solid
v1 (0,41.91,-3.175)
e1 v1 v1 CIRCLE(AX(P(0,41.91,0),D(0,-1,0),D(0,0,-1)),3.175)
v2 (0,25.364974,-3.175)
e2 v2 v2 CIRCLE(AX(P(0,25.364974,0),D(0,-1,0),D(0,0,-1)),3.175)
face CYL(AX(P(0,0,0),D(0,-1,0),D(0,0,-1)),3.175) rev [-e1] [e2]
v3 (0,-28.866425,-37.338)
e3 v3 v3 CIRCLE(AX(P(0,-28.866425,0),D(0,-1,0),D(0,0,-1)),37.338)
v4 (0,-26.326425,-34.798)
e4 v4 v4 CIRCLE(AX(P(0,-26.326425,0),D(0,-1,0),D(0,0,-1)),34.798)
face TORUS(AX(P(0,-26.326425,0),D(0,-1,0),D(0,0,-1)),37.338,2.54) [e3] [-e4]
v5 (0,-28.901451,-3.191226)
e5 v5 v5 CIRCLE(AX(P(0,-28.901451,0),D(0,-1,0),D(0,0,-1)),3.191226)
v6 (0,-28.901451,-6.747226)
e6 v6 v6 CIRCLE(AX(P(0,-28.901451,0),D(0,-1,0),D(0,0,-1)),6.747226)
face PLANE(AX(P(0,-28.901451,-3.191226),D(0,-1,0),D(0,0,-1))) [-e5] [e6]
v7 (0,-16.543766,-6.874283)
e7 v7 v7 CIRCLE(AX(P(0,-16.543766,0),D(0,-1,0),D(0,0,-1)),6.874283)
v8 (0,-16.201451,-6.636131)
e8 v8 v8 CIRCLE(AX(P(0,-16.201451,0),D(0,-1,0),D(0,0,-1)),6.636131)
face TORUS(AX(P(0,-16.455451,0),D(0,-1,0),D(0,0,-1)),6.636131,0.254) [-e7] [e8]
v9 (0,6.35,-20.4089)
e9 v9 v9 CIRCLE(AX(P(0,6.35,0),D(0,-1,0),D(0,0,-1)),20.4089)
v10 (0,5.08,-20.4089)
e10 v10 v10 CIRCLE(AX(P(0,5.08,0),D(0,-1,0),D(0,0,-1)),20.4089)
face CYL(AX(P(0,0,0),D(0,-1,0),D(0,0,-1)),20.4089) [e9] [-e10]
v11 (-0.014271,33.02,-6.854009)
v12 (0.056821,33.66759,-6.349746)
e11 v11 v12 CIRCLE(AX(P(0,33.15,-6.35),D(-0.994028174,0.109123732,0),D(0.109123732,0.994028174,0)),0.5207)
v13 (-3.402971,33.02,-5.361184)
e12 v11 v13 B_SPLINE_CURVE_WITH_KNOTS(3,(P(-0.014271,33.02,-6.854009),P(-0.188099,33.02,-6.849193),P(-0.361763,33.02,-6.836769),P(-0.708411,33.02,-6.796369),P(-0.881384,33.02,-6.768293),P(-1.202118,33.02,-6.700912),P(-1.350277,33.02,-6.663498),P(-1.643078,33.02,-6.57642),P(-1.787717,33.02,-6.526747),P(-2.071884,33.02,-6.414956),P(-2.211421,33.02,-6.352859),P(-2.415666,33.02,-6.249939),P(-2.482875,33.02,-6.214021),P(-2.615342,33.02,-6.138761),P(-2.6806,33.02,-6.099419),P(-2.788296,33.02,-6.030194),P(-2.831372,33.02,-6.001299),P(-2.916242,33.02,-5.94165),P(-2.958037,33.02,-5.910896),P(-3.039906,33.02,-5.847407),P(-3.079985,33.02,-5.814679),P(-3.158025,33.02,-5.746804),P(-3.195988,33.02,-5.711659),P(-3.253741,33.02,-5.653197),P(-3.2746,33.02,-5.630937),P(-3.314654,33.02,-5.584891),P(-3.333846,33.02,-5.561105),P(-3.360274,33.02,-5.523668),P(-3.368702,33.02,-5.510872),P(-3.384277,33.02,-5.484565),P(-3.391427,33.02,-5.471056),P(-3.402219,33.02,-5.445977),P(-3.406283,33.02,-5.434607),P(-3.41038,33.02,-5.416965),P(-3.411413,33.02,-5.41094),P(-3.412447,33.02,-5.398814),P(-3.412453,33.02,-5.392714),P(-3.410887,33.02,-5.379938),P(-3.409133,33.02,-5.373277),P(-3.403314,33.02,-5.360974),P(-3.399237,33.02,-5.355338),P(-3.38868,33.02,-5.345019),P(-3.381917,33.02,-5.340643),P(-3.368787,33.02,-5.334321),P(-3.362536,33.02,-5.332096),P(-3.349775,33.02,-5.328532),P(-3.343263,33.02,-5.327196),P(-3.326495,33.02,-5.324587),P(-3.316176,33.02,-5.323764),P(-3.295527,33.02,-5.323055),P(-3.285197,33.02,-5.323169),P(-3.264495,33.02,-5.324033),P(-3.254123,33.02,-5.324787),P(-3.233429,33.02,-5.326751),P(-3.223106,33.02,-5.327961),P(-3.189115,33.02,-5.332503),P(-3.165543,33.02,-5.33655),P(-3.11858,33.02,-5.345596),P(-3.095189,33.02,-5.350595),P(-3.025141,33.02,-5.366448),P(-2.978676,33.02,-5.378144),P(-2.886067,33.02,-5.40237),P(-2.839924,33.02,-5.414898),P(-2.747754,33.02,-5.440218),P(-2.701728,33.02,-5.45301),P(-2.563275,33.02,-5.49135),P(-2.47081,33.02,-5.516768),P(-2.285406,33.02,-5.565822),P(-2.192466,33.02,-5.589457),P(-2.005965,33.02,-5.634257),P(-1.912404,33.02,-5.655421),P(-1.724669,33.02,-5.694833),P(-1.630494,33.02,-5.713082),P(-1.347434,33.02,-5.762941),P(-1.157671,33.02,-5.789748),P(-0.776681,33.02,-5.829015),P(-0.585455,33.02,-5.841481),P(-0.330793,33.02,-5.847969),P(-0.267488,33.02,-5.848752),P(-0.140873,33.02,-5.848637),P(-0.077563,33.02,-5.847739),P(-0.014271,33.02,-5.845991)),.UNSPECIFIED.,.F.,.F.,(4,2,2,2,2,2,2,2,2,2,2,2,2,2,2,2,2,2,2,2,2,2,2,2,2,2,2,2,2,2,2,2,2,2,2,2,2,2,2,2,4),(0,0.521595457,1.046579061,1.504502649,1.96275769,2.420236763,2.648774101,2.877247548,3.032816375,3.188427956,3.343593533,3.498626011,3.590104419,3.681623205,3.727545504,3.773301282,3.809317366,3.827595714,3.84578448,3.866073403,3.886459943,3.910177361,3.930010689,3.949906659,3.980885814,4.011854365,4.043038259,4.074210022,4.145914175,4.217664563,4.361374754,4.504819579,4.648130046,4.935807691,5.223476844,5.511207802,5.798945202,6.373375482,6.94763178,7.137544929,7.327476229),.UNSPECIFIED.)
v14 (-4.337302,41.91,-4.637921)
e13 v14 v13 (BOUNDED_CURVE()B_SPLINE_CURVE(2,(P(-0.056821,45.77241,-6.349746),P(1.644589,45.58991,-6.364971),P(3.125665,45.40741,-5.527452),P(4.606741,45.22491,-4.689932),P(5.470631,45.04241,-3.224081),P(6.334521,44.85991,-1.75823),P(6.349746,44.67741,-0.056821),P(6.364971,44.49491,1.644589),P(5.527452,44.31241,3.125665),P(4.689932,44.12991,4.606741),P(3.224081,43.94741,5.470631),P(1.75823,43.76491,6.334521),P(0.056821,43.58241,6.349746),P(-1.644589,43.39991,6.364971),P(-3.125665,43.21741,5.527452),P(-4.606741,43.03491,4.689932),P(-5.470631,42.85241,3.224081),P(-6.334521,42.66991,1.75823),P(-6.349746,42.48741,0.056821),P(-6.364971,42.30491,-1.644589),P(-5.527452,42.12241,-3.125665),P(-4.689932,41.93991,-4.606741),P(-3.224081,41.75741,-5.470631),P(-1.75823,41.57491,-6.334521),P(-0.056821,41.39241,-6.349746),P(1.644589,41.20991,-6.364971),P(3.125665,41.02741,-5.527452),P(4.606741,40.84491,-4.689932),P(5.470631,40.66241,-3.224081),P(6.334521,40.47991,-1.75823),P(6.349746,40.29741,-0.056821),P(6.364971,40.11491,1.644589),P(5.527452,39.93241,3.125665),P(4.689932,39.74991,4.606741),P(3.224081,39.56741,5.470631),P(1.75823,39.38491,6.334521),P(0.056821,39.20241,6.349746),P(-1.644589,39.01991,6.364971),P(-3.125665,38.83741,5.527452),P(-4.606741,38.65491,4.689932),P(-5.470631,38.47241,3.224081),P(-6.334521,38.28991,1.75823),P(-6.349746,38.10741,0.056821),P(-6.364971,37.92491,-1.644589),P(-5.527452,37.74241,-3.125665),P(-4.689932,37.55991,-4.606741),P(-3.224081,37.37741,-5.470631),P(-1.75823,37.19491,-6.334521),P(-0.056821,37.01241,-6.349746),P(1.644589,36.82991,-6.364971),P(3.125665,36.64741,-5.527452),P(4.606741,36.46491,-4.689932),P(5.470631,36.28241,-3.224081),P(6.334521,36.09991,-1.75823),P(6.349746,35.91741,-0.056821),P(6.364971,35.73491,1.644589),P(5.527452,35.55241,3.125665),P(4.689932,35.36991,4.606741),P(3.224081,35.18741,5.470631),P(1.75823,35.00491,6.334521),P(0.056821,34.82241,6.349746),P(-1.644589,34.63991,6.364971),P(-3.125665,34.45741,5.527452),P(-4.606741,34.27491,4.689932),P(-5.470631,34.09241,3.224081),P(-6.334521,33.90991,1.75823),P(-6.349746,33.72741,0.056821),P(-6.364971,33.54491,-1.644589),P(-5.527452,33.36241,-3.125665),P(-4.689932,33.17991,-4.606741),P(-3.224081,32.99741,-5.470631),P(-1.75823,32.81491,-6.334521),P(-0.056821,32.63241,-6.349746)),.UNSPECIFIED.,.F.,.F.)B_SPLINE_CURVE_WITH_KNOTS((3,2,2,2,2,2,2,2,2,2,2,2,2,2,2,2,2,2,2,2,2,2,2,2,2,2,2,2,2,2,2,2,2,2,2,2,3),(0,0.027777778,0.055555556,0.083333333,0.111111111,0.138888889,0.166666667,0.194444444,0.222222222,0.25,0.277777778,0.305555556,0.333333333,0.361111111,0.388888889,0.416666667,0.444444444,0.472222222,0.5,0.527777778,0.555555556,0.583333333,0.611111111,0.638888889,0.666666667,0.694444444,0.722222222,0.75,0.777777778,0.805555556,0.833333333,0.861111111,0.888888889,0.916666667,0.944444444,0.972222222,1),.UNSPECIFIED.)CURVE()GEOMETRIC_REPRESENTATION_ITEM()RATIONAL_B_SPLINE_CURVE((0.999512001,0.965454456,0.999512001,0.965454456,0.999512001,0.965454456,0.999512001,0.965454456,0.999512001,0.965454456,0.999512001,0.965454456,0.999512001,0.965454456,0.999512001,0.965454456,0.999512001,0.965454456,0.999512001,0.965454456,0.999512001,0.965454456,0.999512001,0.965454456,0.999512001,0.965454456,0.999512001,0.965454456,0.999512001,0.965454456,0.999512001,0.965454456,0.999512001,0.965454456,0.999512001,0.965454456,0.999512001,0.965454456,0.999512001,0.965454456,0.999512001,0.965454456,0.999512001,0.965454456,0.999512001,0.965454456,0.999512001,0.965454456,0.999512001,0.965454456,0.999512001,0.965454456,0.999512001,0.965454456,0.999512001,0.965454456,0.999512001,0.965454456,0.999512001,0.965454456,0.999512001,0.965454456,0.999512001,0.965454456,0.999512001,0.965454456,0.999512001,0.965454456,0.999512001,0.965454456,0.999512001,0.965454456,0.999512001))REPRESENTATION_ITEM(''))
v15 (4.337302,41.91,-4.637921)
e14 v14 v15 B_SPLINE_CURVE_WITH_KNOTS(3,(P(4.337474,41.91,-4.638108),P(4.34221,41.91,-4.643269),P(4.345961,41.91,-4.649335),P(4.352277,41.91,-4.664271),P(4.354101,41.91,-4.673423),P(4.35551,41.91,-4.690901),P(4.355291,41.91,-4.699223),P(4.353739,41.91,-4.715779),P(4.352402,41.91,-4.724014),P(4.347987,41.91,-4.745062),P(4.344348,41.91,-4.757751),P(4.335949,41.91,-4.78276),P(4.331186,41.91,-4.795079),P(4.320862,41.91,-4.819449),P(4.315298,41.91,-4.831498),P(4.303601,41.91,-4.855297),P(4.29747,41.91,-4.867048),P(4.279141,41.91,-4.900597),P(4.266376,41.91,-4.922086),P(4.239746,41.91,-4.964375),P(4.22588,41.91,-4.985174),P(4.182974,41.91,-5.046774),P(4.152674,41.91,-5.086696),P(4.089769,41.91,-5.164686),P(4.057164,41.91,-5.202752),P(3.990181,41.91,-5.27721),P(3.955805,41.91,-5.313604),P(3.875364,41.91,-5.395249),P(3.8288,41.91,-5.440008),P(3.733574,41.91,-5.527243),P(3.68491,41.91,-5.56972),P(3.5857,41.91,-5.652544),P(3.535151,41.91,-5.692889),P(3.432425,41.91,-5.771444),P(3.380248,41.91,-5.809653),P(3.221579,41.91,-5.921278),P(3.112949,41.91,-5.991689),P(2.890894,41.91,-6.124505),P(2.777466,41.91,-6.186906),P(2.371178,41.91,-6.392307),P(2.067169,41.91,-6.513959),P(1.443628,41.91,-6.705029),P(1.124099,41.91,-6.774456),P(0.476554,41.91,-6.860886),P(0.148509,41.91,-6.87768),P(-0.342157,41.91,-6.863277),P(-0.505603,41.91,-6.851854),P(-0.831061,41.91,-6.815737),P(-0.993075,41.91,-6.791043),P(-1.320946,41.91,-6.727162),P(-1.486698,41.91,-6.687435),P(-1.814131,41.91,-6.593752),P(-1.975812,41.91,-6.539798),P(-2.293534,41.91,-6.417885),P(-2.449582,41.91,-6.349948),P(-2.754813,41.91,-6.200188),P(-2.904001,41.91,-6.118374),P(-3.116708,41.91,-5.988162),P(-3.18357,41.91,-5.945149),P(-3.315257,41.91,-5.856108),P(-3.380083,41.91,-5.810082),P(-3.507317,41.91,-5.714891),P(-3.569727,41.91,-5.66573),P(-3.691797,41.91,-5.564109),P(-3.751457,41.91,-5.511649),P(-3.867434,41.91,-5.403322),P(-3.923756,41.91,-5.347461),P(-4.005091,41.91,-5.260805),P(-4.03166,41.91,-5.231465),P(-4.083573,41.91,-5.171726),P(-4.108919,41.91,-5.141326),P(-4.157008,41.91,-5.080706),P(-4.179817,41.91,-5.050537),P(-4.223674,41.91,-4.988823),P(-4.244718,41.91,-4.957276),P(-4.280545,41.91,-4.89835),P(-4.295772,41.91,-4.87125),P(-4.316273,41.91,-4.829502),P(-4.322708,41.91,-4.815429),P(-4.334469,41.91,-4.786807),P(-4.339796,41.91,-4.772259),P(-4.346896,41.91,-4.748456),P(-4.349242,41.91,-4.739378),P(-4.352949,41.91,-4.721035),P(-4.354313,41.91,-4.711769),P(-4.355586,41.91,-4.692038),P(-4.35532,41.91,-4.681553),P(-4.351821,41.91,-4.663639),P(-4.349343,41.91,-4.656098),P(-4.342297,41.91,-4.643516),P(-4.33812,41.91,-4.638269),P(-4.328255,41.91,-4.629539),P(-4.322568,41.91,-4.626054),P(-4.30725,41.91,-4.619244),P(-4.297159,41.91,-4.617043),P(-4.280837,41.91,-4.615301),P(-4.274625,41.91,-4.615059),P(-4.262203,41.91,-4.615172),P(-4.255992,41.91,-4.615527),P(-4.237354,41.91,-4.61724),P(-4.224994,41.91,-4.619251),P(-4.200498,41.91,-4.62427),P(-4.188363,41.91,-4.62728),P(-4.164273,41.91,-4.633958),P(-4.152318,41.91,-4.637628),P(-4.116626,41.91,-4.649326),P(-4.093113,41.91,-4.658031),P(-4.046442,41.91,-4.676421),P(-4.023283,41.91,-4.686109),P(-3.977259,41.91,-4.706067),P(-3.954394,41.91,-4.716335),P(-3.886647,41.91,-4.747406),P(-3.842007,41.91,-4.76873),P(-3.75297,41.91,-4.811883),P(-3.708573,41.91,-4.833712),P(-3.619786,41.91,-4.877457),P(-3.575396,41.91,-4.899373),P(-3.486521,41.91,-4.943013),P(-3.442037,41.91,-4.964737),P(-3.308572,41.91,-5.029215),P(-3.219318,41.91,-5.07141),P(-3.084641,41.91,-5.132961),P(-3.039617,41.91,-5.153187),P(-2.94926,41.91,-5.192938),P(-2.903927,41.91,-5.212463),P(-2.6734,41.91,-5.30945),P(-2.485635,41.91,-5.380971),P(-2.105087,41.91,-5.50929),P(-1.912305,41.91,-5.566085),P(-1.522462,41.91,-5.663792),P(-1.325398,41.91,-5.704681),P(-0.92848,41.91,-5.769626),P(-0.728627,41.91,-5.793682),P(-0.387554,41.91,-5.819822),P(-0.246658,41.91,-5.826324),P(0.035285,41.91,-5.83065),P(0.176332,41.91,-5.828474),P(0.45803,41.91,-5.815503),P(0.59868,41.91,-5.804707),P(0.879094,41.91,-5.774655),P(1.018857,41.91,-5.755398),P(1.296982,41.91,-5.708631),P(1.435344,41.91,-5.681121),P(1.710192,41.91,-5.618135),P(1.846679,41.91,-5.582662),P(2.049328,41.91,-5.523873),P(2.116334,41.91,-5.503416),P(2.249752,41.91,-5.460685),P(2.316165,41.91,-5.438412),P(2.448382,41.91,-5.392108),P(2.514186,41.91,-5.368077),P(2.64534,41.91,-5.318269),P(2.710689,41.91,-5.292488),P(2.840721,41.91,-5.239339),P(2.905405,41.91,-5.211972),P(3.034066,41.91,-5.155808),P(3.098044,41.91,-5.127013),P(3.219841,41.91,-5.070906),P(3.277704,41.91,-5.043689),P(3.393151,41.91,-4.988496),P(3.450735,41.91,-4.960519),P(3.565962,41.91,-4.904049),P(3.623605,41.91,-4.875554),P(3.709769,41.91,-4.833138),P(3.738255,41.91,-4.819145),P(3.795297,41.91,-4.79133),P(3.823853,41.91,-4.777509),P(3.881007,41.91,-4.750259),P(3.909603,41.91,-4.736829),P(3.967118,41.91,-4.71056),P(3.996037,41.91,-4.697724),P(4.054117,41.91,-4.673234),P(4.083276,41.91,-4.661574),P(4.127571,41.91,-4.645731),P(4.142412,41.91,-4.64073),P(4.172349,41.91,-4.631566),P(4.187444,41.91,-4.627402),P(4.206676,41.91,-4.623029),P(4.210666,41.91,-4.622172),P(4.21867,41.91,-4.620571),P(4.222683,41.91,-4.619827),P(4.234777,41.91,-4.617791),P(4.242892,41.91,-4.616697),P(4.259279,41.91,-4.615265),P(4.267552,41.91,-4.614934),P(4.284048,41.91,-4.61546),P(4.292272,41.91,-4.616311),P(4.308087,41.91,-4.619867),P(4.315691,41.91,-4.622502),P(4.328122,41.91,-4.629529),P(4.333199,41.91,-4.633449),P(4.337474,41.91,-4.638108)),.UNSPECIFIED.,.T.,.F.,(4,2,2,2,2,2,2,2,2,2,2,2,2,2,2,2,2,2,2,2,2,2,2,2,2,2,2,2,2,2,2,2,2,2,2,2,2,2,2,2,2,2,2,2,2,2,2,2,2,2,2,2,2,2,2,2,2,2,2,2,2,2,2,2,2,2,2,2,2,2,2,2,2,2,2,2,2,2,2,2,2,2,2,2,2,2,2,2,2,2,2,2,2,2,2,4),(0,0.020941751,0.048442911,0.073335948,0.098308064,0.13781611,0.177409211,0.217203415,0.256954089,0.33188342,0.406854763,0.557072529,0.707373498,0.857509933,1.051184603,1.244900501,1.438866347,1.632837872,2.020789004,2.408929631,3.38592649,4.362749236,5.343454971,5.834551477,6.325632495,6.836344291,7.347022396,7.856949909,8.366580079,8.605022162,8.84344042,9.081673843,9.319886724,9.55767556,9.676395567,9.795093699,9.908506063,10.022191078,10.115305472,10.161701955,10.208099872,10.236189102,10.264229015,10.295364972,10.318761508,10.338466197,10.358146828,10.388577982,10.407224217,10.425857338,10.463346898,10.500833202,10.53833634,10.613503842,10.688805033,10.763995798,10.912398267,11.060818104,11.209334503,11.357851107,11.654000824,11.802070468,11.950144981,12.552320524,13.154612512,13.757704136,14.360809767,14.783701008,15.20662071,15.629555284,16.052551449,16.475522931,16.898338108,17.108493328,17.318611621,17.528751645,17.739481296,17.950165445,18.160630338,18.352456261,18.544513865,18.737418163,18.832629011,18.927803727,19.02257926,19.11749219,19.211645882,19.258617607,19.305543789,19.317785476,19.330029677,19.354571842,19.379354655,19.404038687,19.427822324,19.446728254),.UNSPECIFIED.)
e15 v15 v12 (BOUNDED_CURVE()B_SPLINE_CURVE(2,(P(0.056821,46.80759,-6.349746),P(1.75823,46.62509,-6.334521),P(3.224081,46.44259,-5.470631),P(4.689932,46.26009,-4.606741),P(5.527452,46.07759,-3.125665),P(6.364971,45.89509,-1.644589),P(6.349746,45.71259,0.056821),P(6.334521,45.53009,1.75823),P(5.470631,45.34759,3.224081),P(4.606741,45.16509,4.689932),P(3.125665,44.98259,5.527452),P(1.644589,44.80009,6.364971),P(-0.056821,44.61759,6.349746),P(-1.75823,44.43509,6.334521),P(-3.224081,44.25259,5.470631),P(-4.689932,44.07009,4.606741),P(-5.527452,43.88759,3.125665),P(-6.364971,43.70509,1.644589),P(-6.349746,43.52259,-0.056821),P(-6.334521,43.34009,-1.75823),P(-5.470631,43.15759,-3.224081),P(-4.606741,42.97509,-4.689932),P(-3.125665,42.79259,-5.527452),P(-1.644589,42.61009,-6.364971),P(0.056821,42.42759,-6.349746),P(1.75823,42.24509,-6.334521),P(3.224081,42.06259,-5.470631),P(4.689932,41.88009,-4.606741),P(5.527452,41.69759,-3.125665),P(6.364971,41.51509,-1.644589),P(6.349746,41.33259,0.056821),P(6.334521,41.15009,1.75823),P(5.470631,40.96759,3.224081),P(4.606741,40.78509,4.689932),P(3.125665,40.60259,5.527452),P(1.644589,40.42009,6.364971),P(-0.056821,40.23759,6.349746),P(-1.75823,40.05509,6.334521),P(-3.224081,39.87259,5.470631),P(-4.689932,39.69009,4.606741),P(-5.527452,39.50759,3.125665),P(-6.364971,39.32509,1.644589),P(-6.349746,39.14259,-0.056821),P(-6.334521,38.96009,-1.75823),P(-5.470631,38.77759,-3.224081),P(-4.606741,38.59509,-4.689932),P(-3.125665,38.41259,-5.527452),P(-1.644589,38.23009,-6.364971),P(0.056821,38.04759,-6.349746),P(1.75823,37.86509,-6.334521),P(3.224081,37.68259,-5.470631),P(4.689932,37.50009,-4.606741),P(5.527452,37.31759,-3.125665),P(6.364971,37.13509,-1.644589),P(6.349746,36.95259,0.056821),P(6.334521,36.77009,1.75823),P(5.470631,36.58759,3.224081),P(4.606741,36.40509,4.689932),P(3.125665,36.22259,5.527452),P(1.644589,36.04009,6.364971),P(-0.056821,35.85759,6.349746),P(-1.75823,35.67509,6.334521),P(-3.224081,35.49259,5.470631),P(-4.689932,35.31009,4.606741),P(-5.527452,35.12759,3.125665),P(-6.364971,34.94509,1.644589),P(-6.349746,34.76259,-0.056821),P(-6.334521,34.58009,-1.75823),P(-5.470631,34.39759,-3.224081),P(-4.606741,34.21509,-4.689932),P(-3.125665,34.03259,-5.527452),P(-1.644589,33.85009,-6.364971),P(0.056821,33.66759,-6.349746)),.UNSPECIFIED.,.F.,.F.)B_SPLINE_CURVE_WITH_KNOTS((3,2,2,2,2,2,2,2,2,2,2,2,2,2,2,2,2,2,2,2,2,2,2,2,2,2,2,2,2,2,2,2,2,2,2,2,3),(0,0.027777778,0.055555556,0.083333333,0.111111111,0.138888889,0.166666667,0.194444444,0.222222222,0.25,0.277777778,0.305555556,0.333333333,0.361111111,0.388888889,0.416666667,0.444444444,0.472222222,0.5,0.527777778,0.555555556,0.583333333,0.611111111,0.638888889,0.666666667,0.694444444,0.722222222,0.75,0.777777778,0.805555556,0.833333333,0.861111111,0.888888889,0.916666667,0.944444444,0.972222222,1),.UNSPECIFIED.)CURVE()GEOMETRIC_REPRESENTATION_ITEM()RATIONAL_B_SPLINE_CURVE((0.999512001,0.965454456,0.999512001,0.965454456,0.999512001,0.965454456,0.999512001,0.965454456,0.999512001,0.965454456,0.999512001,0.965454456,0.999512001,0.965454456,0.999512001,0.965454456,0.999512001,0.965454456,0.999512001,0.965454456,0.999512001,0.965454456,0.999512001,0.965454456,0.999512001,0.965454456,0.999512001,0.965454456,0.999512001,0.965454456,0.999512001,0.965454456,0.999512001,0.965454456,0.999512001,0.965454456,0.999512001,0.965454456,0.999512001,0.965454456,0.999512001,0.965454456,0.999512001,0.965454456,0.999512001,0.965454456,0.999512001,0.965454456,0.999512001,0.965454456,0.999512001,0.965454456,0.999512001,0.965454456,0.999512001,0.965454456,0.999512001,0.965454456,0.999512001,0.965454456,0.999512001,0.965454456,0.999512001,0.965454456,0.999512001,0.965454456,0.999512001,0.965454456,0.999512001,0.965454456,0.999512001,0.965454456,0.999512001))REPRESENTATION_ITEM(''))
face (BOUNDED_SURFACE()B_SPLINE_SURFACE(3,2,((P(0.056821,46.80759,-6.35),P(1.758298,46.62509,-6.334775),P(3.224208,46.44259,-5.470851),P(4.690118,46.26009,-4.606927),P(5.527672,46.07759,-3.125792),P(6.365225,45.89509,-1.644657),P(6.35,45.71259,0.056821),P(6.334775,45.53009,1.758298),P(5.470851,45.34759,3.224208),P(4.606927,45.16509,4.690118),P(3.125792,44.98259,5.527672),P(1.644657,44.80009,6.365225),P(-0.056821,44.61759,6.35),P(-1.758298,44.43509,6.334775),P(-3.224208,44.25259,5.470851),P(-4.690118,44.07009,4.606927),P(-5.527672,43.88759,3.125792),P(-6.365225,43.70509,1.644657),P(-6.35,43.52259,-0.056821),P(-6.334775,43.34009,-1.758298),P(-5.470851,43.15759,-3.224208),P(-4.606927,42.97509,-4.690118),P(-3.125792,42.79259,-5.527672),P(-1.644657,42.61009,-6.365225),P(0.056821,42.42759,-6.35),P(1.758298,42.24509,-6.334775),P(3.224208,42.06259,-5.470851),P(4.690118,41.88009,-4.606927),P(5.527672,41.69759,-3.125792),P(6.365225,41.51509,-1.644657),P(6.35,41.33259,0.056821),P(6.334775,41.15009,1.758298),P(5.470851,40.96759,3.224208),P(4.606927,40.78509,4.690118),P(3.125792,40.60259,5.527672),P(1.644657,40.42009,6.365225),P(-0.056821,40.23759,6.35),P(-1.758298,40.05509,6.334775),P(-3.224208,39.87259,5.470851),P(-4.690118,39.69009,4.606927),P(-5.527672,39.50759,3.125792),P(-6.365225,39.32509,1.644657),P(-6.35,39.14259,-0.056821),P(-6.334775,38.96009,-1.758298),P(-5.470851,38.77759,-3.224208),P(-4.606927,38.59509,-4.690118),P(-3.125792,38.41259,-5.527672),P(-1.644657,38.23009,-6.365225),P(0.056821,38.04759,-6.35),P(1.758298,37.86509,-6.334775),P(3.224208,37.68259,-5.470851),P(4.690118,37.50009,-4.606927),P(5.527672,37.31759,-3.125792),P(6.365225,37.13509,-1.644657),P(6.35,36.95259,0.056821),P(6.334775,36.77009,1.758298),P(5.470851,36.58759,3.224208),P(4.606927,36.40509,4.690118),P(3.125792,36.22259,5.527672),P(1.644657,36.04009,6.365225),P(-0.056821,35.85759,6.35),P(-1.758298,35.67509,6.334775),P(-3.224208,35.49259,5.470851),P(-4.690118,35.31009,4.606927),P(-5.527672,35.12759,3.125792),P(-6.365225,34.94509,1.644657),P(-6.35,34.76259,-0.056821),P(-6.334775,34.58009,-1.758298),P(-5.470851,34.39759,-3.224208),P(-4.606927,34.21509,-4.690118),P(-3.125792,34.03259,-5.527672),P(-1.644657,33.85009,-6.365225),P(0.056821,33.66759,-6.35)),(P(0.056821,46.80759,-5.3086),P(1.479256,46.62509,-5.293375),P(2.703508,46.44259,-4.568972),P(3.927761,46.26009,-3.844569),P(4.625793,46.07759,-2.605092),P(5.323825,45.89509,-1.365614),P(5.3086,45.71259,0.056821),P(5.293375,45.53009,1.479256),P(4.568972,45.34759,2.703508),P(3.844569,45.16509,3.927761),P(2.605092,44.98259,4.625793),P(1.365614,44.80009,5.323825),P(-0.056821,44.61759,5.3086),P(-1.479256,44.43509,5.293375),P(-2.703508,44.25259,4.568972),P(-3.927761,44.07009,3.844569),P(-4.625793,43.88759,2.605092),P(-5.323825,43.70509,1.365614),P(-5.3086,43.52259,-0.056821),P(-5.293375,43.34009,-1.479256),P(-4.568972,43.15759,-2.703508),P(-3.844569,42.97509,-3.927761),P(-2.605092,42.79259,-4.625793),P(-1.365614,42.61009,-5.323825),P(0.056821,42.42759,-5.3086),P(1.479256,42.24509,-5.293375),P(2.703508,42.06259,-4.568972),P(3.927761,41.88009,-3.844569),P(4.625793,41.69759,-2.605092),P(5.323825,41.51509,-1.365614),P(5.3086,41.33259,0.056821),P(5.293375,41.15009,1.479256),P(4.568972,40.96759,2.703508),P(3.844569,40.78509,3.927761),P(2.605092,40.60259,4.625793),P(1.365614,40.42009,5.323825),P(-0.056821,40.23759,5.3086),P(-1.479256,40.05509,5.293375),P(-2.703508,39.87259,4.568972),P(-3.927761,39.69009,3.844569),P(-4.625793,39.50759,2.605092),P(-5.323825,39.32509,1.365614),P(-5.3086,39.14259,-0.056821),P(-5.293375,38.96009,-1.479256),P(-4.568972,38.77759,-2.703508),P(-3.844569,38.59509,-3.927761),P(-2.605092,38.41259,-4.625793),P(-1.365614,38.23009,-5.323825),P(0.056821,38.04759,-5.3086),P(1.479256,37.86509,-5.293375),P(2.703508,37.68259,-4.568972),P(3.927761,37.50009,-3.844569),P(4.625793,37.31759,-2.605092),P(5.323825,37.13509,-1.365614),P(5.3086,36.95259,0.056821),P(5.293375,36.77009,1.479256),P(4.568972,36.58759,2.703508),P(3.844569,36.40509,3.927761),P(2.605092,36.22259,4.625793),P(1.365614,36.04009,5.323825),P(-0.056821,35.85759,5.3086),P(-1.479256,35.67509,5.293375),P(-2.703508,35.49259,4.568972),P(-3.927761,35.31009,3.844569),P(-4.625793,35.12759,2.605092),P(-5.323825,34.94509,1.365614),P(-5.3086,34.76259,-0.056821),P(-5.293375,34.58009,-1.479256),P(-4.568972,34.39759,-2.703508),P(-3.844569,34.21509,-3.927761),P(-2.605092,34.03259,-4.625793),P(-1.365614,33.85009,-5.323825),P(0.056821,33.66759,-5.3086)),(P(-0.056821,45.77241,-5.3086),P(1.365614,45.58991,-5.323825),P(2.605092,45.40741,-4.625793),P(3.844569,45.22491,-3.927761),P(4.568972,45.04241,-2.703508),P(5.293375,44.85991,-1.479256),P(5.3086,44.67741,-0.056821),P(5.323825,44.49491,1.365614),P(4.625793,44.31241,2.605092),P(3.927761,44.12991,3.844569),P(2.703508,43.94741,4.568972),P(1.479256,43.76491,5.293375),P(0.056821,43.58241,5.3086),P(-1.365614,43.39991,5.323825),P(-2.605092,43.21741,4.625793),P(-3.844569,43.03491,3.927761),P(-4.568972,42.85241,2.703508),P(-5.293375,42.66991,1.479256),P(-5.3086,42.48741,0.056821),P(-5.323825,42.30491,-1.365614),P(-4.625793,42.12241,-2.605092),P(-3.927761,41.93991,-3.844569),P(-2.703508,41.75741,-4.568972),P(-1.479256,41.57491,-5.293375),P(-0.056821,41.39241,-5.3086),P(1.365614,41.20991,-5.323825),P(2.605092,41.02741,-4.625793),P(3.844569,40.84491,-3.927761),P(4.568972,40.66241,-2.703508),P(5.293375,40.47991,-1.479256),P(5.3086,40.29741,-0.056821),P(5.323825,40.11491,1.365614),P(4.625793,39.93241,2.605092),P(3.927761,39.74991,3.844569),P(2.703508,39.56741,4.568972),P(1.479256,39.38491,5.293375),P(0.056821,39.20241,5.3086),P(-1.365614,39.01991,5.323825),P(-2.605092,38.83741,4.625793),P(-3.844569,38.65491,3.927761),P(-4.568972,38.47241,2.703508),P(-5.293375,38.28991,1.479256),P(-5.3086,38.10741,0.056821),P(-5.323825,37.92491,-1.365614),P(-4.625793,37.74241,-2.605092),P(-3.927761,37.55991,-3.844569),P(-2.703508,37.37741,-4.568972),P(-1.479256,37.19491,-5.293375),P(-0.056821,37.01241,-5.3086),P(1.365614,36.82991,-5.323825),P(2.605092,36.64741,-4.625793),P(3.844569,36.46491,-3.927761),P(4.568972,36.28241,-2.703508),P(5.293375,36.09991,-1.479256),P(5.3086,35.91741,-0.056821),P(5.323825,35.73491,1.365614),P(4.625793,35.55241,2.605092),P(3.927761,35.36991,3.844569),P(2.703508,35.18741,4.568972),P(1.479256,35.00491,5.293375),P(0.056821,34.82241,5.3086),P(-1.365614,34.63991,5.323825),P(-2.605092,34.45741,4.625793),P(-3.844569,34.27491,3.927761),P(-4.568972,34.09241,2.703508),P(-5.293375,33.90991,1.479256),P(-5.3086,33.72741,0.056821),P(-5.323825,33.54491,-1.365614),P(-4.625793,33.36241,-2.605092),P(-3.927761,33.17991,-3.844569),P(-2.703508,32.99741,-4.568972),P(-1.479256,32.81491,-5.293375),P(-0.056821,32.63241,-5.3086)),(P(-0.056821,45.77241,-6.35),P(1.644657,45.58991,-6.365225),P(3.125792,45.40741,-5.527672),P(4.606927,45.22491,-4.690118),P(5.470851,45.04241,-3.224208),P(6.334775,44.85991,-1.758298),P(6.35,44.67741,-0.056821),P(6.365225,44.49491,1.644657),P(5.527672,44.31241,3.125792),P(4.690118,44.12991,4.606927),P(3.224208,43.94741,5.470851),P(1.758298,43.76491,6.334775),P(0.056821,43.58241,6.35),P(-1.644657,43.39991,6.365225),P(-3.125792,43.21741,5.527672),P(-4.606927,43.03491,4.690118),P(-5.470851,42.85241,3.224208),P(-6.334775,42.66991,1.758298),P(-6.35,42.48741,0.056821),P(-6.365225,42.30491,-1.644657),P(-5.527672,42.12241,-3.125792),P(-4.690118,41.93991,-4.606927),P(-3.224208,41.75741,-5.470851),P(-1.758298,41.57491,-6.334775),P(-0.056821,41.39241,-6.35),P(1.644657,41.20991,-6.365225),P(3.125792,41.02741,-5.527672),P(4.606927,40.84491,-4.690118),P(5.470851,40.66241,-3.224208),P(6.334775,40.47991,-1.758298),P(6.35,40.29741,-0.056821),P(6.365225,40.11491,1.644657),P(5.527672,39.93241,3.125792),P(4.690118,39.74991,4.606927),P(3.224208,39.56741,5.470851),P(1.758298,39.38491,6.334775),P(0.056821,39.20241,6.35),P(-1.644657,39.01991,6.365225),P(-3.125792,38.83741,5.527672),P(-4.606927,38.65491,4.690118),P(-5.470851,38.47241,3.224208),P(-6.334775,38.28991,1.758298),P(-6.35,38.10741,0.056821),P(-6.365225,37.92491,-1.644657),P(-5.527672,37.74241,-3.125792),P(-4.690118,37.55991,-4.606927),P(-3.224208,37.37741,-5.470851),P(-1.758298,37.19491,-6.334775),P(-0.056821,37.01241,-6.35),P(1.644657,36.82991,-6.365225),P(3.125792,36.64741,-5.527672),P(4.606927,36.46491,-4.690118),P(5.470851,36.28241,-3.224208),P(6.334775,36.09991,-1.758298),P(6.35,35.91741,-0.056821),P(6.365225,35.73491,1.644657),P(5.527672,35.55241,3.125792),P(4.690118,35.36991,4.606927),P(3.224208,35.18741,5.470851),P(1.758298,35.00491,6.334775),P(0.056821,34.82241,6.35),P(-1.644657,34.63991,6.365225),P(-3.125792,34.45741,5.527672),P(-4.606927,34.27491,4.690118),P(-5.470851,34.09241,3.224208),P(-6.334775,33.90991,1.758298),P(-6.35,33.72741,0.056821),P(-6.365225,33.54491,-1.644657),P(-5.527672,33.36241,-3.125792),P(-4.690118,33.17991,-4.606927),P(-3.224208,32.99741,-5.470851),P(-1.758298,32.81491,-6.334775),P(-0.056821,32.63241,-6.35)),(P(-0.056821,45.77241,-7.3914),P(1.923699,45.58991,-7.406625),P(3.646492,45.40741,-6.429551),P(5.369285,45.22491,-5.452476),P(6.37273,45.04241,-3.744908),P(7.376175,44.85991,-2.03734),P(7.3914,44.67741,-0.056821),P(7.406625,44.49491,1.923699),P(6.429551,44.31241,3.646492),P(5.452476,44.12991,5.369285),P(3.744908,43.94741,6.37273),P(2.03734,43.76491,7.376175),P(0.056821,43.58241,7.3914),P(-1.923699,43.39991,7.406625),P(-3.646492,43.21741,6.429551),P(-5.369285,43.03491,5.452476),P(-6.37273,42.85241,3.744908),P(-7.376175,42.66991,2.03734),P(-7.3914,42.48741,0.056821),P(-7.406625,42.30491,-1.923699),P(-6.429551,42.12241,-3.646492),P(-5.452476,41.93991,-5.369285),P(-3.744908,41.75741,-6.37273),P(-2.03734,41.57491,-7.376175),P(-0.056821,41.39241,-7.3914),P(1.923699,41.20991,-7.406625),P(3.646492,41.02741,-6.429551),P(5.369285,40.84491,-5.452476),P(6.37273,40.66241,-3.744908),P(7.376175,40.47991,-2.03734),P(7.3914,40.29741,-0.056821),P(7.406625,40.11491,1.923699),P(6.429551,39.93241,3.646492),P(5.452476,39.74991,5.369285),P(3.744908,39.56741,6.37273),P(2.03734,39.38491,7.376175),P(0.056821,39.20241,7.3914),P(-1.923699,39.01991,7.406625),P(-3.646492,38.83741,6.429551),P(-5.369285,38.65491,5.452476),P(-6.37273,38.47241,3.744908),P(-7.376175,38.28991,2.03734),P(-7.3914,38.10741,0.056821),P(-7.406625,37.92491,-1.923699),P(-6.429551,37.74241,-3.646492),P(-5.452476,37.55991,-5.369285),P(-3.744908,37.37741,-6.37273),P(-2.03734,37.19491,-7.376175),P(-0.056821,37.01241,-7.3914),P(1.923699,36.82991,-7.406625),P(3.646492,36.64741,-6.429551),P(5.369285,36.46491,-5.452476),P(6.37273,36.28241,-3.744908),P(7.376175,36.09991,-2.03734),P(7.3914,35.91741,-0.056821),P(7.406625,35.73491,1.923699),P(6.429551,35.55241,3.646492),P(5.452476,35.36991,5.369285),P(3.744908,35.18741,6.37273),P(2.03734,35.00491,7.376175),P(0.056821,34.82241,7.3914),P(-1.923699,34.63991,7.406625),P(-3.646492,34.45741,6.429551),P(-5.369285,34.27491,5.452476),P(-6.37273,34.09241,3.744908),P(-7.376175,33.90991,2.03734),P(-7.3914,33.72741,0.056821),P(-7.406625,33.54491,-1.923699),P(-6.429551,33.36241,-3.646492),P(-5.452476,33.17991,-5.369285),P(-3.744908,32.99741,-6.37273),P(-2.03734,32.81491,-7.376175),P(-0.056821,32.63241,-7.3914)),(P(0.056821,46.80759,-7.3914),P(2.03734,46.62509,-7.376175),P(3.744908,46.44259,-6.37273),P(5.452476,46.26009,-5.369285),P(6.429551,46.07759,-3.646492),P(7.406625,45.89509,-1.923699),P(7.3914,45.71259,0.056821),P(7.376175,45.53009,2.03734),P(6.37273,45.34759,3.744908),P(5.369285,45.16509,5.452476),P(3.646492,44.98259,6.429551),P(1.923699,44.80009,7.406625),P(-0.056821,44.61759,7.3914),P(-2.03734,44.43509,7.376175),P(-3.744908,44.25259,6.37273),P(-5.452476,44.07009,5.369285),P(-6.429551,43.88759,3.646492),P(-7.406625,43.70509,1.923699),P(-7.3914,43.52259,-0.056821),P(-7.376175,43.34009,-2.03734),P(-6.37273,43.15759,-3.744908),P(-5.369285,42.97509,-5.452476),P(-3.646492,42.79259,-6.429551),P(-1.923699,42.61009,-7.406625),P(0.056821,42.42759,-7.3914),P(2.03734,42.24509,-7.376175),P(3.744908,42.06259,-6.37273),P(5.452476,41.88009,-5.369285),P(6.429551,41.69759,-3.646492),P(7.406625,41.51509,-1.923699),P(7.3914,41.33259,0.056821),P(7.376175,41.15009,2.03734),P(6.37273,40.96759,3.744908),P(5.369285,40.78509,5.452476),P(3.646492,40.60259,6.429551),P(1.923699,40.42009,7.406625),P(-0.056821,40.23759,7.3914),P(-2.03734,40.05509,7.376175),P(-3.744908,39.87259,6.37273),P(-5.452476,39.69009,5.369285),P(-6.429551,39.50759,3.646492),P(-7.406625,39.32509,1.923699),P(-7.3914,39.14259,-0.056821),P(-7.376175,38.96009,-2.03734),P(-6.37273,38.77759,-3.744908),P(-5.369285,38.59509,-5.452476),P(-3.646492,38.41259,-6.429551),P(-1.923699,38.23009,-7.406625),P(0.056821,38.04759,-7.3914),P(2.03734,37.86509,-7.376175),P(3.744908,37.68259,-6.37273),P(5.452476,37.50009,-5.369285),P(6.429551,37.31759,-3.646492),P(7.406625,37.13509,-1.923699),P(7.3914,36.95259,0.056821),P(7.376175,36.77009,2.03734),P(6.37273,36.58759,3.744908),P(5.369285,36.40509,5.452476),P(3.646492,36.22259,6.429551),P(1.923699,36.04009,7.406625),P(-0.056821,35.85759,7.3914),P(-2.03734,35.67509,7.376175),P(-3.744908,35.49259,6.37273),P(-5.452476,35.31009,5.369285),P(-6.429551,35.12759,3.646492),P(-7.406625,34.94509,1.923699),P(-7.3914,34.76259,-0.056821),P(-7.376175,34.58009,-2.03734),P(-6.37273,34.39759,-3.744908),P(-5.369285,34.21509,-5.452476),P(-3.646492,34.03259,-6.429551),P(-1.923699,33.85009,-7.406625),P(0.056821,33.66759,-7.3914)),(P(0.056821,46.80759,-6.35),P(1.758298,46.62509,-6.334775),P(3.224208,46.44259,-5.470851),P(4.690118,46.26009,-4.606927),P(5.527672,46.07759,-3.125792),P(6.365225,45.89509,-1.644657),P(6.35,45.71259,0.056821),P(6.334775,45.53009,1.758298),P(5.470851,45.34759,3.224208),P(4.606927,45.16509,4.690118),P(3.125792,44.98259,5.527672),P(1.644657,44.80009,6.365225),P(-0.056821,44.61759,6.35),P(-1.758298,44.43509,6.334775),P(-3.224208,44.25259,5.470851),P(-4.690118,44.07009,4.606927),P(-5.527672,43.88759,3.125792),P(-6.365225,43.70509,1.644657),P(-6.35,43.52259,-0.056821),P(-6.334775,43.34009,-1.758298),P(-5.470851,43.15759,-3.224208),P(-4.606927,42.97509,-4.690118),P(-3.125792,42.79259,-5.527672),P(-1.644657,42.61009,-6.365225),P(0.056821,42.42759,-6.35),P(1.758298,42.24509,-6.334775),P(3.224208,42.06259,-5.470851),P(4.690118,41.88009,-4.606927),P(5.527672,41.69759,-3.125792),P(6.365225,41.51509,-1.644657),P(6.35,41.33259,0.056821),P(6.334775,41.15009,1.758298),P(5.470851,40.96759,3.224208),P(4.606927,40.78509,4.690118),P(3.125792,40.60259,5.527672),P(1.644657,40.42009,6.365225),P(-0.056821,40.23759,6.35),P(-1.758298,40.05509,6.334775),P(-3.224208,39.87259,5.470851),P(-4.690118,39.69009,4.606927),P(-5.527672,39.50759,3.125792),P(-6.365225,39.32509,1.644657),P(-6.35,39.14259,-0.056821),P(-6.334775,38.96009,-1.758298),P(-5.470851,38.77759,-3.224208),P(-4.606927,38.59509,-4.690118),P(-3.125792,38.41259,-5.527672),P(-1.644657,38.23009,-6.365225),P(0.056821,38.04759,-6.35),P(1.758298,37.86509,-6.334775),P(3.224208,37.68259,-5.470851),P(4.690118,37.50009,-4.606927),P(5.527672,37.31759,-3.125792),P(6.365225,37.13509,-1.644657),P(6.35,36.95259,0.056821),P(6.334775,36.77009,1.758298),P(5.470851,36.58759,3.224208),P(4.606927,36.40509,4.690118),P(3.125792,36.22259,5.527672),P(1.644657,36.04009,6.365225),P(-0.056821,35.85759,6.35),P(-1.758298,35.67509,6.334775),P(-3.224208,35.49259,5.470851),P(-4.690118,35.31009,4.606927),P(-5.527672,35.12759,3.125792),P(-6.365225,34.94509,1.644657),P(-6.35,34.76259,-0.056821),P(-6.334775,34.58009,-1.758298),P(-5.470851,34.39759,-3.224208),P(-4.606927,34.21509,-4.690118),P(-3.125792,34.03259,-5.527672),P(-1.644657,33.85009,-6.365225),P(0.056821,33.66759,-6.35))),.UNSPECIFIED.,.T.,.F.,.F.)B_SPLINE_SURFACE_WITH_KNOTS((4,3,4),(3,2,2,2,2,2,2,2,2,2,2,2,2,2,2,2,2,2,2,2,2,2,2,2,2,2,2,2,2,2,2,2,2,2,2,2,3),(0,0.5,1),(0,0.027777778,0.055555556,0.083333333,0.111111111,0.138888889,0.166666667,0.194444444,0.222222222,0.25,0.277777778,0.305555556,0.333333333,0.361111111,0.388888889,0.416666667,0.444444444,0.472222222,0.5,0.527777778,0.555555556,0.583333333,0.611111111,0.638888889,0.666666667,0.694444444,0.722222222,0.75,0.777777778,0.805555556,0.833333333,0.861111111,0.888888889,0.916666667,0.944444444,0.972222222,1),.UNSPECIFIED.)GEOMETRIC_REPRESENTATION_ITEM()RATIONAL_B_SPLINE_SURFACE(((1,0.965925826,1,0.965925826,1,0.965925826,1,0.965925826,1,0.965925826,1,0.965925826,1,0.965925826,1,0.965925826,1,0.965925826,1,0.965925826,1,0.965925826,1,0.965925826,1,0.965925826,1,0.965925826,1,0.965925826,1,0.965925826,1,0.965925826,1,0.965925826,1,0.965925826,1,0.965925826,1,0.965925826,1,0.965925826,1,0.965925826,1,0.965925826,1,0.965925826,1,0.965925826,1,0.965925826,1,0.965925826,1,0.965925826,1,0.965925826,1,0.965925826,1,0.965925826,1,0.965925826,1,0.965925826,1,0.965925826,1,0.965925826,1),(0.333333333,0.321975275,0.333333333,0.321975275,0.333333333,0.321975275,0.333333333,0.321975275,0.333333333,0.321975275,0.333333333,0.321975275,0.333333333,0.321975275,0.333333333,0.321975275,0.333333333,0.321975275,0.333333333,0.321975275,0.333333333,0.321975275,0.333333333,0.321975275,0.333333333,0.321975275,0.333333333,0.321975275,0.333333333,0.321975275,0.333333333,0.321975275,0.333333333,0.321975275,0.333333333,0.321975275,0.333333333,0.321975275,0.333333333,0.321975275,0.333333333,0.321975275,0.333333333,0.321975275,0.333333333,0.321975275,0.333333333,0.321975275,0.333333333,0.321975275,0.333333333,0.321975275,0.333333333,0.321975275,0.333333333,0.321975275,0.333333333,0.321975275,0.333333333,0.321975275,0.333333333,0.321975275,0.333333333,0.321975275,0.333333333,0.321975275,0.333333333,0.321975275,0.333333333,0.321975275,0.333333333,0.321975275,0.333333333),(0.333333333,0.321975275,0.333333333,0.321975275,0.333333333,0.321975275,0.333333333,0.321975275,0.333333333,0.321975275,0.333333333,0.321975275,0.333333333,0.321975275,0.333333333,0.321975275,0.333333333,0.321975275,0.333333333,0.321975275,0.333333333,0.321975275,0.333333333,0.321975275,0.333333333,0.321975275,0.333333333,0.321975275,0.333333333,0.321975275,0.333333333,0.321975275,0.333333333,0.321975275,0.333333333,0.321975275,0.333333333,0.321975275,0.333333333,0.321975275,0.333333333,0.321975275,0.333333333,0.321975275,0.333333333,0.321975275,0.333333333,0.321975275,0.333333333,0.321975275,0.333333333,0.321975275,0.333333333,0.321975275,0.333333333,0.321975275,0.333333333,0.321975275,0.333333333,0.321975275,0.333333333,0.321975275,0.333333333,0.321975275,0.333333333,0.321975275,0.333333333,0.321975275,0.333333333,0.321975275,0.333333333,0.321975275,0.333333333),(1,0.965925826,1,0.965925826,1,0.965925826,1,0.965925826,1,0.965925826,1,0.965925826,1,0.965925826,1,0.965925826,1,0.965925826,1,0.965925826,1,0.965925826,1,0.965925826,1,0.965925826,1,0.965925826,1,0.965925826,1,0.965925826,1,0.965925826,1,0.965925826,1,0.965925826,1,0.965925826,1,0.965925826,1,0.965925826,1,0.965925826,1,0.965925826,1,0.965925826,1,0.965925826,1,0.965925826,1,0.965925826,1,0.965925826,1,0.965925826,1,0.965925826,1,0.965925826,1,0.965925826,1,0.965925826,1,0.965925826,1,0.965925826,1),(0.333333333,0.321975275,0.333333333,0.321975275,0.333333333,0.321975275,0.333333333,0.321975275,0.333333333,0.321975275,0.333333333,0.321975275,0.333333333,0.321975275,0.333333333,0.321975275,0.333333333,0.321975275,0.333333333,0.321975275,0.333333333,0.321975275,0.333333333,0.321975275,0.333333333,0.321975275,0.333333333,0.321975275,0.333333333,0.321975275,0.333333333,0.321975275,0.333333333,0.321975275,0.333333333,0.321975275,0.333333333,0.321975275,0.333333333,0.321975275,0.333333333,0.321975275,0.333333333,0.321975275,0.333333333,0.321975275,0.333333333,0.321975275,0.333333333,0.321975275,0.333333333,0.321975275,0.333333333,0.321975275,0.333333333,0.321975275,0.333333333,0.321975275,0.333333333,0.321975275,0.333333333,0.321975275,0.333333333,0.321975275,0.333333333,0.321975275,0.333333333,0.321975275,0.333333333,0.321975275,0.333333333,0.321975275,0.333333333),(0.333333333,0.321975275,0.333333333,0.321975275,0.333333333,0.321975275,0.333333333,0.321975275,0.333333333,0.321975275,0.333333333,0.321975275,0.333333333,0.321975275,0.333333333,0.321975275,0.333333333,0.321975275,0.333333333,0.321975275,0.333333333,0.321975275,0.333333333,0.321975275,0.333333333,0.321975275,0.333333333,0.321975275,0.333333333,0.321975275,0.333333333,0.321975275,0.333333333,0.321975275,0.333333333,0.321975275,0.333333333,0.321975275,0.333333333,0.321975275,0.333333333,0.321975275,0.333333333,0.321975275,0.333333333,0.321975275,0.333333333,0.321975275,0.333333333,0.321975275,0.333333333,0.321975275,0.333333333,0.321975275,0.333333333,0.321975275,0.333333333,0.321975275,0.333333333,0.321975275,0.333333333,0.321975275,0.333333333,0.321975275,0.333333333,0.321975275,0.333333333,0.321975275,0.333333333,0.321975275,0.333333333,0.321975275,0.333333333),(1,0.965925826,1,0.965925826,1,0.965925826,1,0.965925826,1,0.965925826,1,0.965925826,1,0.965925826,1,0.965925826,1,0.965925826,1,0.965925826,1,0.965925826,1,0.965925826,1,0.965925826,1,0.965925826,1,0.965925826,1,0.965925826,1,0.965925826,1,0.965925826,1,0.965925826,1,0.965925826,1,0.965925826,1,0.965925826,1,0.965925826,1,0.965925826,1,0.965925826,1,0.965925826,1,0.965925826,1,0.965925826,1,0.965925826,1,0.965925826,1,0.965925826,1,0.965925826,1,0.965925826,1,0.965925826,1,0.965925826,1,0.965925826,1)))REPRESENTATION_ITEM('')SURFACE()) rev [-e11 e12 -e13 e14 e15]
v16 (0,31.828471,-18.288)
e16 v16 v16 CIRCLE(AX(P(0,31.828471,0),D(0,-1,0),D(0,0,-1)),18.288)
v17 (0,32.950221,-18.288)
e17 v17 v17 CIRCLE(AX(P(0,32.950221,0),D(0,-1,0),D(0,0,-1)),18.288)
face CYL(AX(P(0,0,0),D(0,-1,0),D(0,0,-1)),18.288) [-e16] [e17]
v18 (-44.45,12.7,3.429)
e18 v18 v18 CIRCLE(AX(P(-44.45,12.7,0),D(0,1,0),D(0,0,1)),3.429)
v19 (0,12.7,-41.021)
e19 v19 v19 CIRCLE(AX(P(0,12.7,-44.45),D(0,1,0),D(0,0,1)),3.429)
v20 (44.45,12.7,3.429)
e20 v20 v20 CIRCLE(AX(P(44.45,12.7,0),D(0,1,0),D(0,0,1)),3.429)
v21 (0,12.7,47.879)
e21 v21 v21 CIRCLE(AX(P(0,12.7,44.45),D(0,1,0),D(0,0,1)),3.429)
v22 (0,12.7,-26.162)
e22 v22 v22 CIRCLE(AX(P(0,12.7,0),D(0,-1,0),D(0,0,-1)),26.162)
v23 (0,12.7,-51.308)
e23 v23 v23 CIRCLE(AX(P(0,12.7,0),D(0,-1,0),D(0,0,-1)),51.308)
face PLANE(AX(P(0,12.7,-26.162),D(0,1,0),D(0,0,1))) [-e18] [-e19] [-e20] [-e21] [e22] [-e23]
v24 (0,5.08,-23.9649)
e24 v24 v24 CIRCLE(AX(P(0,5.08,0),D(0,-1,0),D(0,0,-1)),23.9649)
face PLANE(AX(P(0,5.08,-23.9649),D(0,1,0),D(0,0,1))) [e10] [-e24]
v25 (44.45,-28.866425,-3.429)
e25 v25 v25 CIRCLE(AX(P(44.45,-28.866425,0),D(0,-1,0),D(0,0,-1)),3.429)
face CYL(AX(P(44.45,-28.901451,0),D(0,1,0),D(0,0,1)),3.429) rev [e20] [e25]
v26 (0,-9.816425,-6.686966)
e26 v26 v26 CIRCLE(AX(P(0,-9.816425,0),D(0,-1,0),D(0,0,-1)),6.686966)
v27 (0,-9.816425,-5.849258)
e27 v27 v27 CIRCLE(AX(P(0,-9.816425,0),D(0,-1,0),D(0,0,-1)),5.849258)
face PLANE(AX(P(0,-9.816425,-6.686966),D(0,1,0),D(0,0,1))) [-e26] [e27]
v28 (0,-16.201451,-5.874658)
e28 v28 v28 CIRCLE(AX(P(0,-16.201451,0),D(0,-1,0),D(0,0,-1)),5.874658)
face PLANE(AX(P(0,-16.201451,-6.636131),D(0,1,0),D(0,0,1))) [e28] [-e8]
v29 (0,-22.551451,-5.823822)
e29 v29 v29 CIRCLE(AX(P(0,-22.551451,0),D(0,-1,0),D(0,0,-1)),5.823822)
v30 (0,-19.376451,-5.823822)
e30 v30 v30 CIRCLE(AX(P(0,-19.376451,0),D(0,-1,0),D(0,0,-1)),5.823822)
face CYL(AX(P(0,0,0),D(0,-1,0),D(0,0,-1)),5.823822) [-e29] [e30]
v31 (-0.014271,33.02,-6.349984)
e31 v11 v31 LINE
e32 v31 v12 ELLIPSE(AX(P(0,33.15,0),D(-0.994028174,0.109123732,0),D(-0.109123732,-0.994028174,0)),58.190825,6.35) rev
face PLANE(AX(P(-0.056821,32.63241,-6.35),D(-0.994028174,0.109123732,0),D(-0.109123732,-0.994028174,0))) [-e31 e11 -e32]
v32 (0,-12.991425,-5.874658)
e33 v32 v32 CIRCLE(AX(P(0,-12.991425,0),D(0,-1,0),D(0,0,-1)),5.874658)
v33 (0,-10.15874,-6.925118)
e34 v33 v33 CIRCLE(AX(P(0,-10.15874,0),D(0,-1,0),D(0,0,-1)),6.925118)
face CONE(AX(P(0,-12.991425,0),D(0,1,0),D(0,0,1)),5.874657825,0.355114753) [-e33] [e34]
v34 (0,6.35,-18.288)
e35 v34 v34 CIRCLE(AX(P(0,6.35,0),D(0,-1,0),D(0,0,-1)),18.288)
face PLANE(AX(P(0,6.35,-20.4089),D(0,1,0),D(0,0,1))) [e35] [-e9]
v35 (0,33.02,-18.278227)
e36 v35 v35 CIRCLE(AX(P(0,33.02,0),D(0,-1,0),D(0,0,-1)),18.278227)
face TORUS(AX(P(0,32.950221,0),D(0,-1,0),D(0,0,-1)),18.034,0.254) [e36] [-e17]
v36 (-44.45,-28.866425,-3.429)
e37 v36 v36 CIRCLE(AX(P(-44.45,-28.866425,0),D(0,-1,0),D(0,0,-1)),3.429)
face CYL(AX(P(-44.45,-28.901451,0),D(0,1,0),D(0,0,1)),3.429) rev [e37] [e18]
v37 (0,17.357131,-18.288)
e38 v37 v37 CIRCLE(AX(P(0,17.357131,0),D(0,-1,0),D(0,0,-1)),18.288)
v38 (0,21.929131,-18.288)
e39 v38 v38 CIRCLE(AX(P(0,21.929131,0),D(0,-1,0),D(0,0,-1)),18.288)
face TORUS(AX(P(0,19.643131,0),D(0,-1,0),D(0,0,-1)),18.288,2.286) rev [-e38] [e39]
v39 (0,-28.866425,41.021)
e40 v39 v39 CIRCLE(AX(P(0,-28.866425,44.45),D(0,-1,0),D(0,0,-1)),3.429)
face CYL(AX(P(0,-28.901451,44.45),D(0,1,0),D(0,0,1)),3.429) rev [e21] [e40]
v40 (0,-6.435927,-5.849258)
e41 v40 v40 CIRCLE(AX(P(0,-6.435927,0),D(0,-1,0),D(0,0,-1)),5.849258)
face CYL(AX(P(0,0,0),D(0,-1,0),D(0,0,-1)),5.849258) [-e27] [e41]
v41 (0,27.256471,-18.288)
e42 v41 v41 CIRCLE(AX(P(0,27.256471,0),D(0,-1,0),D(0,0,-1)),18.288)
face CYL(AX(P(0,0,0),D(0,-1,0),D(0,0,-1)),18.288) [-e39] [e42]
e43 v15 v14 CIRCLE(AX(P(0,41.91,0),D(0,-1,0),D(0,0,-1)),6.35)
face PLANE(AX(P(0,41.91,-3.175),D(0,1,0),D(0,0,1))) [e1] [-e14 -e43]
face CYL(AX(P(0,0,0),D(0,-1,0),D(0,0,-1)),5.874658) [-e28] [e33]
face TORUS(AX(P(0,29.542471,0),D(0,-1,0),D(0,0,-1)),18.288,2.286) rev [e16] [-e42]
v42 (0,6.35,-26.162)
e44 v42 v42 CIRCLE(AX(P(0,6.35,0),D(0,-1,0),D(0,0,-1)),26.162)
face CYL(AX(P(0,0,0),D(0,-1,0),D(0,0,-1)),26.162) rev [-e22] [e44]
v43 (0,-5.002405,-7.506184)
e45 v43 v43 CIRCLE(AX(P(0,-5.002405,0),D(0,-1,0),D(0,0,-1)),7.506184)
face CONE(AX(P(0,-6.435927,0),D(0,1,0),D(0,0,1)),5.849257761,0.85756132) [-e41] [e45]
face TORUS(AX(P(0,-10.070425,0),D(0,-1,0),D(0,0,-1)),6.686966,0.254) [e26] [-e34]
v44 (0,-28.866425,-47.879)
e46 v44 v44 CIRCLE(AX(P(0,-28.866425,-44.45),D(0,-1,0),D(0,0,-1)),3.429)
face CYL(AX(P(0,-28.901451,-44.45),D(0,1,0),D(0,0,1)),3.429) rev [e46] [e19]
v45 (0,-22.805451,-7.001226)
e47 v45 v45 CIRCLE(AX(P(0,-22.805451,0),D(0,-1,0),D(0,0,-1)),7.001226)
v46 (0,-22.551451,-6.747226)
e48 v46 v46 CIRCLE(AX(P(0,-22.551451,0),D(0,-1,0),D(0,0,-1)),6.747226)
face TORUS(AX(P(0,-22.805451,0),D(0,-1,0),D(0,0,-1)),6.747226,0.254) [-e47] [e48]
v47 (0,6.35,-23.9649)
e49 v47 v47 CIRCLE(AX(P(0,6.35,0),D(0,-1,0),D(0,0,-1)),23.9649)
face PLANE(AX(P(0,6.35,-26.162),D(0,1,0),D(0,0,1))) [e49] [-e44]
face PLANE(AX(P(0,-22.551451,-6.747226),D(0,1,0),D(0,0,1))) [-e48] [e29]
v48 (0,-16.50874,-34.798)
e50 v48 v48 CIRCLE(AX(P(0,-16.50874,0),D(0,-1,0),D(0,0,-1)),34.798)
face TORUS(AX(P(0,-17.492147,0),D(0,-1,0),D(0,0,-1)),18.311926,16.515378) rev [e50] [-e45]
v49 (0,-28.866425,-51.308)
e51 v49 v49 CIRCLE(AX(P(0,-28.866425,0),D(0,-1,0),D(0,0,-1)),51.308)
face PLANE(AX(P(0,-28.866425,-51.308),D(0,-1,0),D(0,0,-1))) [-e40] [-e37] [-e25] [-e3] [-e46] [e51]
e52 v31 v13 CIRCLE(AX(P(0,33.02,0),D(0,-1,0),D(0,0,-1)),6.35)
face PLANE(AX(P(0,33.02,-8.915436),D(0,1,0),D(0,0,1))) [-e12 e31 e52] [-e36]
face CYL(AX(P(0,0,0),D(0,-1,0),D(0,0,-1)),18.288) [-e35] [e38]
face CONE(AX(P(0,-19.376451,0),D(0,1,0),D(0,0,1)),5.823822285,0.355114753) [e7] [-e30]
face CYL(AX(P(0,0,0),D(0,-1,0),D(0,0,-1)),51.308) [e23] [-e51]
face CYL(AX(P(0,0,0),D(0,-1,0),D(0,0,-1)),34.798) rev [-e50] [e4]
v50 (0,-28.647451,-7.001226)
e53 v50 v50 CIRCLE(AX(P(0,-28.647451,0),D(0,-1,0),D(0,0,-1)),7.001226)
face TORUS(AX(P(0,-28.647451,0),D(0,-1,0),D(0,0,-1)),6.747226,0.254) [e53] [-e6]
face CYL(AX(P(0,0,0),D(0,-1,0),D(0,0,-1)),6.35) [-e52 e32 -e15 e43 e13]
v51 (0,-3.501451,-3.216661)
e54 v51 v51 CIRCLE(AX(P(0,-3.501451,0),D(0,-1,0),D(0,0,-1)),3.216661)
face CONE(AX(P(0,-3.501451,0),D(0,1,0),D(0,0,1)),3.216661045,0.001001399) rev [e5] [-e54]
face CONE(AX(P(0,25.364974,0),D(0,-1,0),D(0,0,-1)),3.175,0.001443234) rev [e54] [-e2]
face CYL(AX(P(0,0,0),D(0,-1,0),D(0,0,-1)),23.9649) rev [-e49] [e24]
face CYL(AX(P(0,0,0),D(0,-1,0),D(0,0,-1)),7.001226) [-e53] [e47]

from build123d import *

# Parameters (mm, degrees)
CUT_SWEEP1_PITCH   = 4.38
SKETCH23_R         = 3.429
CUT_EXTRUDE1_DEPTH = 84.794211234
CIRPATTERN1_COUNT  = 4


with BuildPart() as part:
    # Sketch2 → Revolve2 (revolve)
    with BuildSketch(Plane(origin=(0, 0, 0), x_dir=(0, 0, -1), z_dir=(1, 0, 0))):
        with BuildLine():
            Line((8.915435541, 33.02), (18.278227083, 33.02))
            ThreePointArc((18.278227083, 33.02), (18.285544906, 32.985450941), (18.288, 32.950220834))
            Line((18.288, 32.950220834), (18.288, 31.828471157))
            ThreePointArc((18.288, 31.828471157), (16.002, 29.542471157), (18.288, 27.256471157))
            Line((18.288, 27.256471157), (18.288, 21.929131456))
            ThreePointArc((18.288, 21.929131456), (16.002, 19.643131456), (18.288, 17.357131456))
            Line((18.288, 17.357131456), (18.288, 6.35))
            Line((18.288, 6.35), (20.4089, 6.35))
            Line((20.4089, 6.35), (20.4089, 5.08))
            Line((20.4089, 5.08), (23.9649, 5.08))
            Line((23.9649, 5.08), (23.9649, 6.35))
            Line((23.9649, 6.35), (26.162, 6.35))
            Line((26.162, 6.35), (26.162, 12.7))
            Line((26.162, 12.7), (51.308, 12.7))
            Line((51.308, 12.7), (51.308, 0))
            Line((51.308, 0), (51.308, -28.866424571))
            Line((51.308, -28.866424571), (37.338, -28.866424571))
            ThreePointArc((37.338, -28.866424571), (35.541948776, -28.122475795), (34.798, -26.326424571))
            Line((34.798, -26.326424571), (34.798, -16.508739853))
            ThreePointArc((34.798, -16.508739853), (24.727959014, -2.273992307), (7.506184264, -5.002405335))
            Line((7.506184264, -5.002405335), (5.849257761, -6.435927387))
            Line((5.849257761, -6.435927387), (5.849257761, -9.816424571))
            Line((5.849257761, -9.816424571), (6.686966257, -9.816424571))
            ThreePointArc((6.686966257, -9.816424571), (6.895470551, -9.925366103), (6.925118332, -10.158739853))
            Line((6.925118332, -10.158739853), (5.874657825, -12.991424571))
            Line((5.874657825, -12.991424571), (5.874657825, -16.201450646))
            Line((5.874657825, -16.201450646), (6.636130716, -16.201450646))
            ThreePointArc((6.636130716, -16.201450646), (6.844635011, -16.310392178), (6.874282791, -16.543765928))
            Line((6.874282791, -16.543765928), (5.823822285, -19.376450646))
            Line((5.823822285, -19.376450646), (5.823822285, -22.551450646))
            Line((5.823822285, -22.551450646), (6.747225505, -22.551450646))
            ThreePointArc((6.747225505, -22.551450646), (6.926830627, -22.625845524), (7.001225505, -22.805450646))
            Line((7.001225505, -22.805450646), (7.001225505, -28.647450646))
            ThreePointArc((7.001225505, -28.647450646), (6.926830627, -28.827055769), (6.747225505, -28.901450646))
            Line((6.747225505, -28.901450646), (3.191225505, -28.901450646))
            Line((3.191225505, -28.901450646), (3.216661045, -3.501450646))
            Line((3.216661045, -3.501450646), (3.175, 25.364973925))
            Line((3.175, 25.364973925), (3.175, 38.064973925))
            Line((3.175, 38.064973925), (3.175, 41.91))
            Line((3.175, 41.91), (6.35, 41.91))
            Line((6.35, 41.91), (6.35, 33.02))
            Line((6.35, 33.02), (8.915435541, 33.02))
        make_face()
    revolve(axis=Axis((0, 0, 0), (0, 1, 0)))

    # Cut-Sweep1: arcs per turn and ends read off the stored shape
    # Cut-Sweep1: the profile of Cut-Sweep1 profile screwed along a right-hand helix through 3 turns, 12 arcs to a turn; built about Z, then put on its axis
    cut_sweep1_z = Axis((0, 0, 0), (0, 0, 1))
    cut_sweep1_corners = [(6.35, 0.056820727, -4.89759047), (5.8293, 0, -4.38), (6.35, -0.056820727, -3.86240953), (6.8707, 0, -4.38)]
    with BuildLine(mode=Mode.PRIVATE) as cut_sweep1_profile:
        ThreePointArc((6.35, 0.056820727, -4.89759047), (5.981809499, 0.040178322, -4.745991731), (5.8293, 0, -4.38))
        ThreePointArc((5.8293, 0, -4.38), (5.981809499, -0.040178322, -4.014008269), (6.35, -0.056820727, -3.86240953))
        ThreePointArc((6.35, -0.056820727, -3.86240953), (6.718190501, -0.040178322, -4.014008269), (6.8707, 0, -4.38))
        ThreePointArc((6.8707, 0, -4.38), (6.718190501, 0.040178322, -4.745991731), (6.35, 0.056820727, -4.89759047))
    cut_sweep1_cap = Face(cut_sweep1_profile.wire())
    cut_sweep1_arcs = [((6.35, 0.056820727, -4.89759047), (5.8293, 0.056820727, -4.89759047), (5.8293, 0, -4.38), (1, 0.7071067811865476, 1)), ((5.8293, 0, -4.38), (5.8293, -0.056820727, -3.86240953), (6.35, -0.056820727, -3.86240953), (1, 0.7071067811865476, 1)), ((6.35, -0.056820727, -3.86240953), (6.8707, -0.056820727, -3.86240953), (6.8707, 0, -4.38), (1, 0.7071067811865476, 1)), ((6.8707, 0, -4.38), (6.8707, 0.056820727, -4.89759047), (6.35, 0.056820727, -4.89759047), (1, 0.7071067811865476, 1))]  # start, shoulder, end, weights
    cut_sweep1_turn_angles = [0, 15, 30, 45, 60, 75, 90, 105, 120, 135, 150, 165, 180, 195, 210, 225, 240, 255, 270, 285, 300, 315, 330, 345, 360]
    cut_sweep1_turn_weights = [1, 0.9659258262890683, 1, 0.9659258262890683, 1, 0.9659258262890683, 1, 0.9659258262890683, 1, 0.9659258262890683, 1, 0.9659258262890683, 1, 0.9659258262890683, 1, 0.9659258262890683, 1, 0.9659258262890683, 1, 0.9659258262890683, 1, 0.9659258262890683, 1, 0.9659258262890683, 1]
    cut_sweep1_turn_sides = [Face.make_bezier_surface([[Vector(p[j][0], p[j][1], 0).rotate(cut_sweep1_z, cut_sweep1_turn_angles[2 * i + k]) / cut_sweep1_turn_weights[2 * i + k] + Vector(0, 0, p[j][2] + CUT_SWEEP1_PITCH * cut_sweep1_turn_angles[2 * i + k] / 360) for k in range(3)] for j in range(3)], [[p[3][j] * cut_sweep1_turn_weights[2 * i + k] for k in range(3)] for j in range(3)]) for p in cut_sweep1_arcs for i in range(12)]
    cut_sweep1 = Plane(origin=(0, 41.91, 0), x_dir=(0, 0, -1), z_dir=(0, -1, 0)) * Solid(Shell([*[p.moved(Location((0, 0, CUT_SWEEP1_PITCH * i))) for i in range(3) for p in cut_sweep1_turn_sides], cut_sweep1_cap, cut_sweep1_cap.rotate(cut_sweep1_z, 1080).moved(Location((0, 0, CUT_SWEEP1_PITCH * 1080 / 360)))]))
    add(cut_sweep1, mode=Mode.SUBTRACT)

    # Sketch23 → Cut-Extrude1 (cut, symmetric)
    with BuildSketch(Plane(origin=(0, 0, 0), x_dir=(1, 0, 0), z_dir=(0, 1, 0))):
        with Locations(Location((0, 44.45, 0), (0, 0, 270))):
            Circle(SKETCH23_R)
    cut_extrude1 = extrude(amount=CUT_EXTRUDE1_DEPTH, both=True, mode=Mode.SUBTRACT)

    # CirPattern1: Cut-Extrude1 ×4 about axis
    cirpattern1_axis = Axis((0, 0, 0), (0, 1, 0))
    for i in range(1, CIRPATTERN1_COUNT):
        add(cut_extrude1.rotate(cirpattern1_axis, i * 360 / CIRPATTERN1_COUNT), mode=Mode.SUBTRACT)


solid = part.part
